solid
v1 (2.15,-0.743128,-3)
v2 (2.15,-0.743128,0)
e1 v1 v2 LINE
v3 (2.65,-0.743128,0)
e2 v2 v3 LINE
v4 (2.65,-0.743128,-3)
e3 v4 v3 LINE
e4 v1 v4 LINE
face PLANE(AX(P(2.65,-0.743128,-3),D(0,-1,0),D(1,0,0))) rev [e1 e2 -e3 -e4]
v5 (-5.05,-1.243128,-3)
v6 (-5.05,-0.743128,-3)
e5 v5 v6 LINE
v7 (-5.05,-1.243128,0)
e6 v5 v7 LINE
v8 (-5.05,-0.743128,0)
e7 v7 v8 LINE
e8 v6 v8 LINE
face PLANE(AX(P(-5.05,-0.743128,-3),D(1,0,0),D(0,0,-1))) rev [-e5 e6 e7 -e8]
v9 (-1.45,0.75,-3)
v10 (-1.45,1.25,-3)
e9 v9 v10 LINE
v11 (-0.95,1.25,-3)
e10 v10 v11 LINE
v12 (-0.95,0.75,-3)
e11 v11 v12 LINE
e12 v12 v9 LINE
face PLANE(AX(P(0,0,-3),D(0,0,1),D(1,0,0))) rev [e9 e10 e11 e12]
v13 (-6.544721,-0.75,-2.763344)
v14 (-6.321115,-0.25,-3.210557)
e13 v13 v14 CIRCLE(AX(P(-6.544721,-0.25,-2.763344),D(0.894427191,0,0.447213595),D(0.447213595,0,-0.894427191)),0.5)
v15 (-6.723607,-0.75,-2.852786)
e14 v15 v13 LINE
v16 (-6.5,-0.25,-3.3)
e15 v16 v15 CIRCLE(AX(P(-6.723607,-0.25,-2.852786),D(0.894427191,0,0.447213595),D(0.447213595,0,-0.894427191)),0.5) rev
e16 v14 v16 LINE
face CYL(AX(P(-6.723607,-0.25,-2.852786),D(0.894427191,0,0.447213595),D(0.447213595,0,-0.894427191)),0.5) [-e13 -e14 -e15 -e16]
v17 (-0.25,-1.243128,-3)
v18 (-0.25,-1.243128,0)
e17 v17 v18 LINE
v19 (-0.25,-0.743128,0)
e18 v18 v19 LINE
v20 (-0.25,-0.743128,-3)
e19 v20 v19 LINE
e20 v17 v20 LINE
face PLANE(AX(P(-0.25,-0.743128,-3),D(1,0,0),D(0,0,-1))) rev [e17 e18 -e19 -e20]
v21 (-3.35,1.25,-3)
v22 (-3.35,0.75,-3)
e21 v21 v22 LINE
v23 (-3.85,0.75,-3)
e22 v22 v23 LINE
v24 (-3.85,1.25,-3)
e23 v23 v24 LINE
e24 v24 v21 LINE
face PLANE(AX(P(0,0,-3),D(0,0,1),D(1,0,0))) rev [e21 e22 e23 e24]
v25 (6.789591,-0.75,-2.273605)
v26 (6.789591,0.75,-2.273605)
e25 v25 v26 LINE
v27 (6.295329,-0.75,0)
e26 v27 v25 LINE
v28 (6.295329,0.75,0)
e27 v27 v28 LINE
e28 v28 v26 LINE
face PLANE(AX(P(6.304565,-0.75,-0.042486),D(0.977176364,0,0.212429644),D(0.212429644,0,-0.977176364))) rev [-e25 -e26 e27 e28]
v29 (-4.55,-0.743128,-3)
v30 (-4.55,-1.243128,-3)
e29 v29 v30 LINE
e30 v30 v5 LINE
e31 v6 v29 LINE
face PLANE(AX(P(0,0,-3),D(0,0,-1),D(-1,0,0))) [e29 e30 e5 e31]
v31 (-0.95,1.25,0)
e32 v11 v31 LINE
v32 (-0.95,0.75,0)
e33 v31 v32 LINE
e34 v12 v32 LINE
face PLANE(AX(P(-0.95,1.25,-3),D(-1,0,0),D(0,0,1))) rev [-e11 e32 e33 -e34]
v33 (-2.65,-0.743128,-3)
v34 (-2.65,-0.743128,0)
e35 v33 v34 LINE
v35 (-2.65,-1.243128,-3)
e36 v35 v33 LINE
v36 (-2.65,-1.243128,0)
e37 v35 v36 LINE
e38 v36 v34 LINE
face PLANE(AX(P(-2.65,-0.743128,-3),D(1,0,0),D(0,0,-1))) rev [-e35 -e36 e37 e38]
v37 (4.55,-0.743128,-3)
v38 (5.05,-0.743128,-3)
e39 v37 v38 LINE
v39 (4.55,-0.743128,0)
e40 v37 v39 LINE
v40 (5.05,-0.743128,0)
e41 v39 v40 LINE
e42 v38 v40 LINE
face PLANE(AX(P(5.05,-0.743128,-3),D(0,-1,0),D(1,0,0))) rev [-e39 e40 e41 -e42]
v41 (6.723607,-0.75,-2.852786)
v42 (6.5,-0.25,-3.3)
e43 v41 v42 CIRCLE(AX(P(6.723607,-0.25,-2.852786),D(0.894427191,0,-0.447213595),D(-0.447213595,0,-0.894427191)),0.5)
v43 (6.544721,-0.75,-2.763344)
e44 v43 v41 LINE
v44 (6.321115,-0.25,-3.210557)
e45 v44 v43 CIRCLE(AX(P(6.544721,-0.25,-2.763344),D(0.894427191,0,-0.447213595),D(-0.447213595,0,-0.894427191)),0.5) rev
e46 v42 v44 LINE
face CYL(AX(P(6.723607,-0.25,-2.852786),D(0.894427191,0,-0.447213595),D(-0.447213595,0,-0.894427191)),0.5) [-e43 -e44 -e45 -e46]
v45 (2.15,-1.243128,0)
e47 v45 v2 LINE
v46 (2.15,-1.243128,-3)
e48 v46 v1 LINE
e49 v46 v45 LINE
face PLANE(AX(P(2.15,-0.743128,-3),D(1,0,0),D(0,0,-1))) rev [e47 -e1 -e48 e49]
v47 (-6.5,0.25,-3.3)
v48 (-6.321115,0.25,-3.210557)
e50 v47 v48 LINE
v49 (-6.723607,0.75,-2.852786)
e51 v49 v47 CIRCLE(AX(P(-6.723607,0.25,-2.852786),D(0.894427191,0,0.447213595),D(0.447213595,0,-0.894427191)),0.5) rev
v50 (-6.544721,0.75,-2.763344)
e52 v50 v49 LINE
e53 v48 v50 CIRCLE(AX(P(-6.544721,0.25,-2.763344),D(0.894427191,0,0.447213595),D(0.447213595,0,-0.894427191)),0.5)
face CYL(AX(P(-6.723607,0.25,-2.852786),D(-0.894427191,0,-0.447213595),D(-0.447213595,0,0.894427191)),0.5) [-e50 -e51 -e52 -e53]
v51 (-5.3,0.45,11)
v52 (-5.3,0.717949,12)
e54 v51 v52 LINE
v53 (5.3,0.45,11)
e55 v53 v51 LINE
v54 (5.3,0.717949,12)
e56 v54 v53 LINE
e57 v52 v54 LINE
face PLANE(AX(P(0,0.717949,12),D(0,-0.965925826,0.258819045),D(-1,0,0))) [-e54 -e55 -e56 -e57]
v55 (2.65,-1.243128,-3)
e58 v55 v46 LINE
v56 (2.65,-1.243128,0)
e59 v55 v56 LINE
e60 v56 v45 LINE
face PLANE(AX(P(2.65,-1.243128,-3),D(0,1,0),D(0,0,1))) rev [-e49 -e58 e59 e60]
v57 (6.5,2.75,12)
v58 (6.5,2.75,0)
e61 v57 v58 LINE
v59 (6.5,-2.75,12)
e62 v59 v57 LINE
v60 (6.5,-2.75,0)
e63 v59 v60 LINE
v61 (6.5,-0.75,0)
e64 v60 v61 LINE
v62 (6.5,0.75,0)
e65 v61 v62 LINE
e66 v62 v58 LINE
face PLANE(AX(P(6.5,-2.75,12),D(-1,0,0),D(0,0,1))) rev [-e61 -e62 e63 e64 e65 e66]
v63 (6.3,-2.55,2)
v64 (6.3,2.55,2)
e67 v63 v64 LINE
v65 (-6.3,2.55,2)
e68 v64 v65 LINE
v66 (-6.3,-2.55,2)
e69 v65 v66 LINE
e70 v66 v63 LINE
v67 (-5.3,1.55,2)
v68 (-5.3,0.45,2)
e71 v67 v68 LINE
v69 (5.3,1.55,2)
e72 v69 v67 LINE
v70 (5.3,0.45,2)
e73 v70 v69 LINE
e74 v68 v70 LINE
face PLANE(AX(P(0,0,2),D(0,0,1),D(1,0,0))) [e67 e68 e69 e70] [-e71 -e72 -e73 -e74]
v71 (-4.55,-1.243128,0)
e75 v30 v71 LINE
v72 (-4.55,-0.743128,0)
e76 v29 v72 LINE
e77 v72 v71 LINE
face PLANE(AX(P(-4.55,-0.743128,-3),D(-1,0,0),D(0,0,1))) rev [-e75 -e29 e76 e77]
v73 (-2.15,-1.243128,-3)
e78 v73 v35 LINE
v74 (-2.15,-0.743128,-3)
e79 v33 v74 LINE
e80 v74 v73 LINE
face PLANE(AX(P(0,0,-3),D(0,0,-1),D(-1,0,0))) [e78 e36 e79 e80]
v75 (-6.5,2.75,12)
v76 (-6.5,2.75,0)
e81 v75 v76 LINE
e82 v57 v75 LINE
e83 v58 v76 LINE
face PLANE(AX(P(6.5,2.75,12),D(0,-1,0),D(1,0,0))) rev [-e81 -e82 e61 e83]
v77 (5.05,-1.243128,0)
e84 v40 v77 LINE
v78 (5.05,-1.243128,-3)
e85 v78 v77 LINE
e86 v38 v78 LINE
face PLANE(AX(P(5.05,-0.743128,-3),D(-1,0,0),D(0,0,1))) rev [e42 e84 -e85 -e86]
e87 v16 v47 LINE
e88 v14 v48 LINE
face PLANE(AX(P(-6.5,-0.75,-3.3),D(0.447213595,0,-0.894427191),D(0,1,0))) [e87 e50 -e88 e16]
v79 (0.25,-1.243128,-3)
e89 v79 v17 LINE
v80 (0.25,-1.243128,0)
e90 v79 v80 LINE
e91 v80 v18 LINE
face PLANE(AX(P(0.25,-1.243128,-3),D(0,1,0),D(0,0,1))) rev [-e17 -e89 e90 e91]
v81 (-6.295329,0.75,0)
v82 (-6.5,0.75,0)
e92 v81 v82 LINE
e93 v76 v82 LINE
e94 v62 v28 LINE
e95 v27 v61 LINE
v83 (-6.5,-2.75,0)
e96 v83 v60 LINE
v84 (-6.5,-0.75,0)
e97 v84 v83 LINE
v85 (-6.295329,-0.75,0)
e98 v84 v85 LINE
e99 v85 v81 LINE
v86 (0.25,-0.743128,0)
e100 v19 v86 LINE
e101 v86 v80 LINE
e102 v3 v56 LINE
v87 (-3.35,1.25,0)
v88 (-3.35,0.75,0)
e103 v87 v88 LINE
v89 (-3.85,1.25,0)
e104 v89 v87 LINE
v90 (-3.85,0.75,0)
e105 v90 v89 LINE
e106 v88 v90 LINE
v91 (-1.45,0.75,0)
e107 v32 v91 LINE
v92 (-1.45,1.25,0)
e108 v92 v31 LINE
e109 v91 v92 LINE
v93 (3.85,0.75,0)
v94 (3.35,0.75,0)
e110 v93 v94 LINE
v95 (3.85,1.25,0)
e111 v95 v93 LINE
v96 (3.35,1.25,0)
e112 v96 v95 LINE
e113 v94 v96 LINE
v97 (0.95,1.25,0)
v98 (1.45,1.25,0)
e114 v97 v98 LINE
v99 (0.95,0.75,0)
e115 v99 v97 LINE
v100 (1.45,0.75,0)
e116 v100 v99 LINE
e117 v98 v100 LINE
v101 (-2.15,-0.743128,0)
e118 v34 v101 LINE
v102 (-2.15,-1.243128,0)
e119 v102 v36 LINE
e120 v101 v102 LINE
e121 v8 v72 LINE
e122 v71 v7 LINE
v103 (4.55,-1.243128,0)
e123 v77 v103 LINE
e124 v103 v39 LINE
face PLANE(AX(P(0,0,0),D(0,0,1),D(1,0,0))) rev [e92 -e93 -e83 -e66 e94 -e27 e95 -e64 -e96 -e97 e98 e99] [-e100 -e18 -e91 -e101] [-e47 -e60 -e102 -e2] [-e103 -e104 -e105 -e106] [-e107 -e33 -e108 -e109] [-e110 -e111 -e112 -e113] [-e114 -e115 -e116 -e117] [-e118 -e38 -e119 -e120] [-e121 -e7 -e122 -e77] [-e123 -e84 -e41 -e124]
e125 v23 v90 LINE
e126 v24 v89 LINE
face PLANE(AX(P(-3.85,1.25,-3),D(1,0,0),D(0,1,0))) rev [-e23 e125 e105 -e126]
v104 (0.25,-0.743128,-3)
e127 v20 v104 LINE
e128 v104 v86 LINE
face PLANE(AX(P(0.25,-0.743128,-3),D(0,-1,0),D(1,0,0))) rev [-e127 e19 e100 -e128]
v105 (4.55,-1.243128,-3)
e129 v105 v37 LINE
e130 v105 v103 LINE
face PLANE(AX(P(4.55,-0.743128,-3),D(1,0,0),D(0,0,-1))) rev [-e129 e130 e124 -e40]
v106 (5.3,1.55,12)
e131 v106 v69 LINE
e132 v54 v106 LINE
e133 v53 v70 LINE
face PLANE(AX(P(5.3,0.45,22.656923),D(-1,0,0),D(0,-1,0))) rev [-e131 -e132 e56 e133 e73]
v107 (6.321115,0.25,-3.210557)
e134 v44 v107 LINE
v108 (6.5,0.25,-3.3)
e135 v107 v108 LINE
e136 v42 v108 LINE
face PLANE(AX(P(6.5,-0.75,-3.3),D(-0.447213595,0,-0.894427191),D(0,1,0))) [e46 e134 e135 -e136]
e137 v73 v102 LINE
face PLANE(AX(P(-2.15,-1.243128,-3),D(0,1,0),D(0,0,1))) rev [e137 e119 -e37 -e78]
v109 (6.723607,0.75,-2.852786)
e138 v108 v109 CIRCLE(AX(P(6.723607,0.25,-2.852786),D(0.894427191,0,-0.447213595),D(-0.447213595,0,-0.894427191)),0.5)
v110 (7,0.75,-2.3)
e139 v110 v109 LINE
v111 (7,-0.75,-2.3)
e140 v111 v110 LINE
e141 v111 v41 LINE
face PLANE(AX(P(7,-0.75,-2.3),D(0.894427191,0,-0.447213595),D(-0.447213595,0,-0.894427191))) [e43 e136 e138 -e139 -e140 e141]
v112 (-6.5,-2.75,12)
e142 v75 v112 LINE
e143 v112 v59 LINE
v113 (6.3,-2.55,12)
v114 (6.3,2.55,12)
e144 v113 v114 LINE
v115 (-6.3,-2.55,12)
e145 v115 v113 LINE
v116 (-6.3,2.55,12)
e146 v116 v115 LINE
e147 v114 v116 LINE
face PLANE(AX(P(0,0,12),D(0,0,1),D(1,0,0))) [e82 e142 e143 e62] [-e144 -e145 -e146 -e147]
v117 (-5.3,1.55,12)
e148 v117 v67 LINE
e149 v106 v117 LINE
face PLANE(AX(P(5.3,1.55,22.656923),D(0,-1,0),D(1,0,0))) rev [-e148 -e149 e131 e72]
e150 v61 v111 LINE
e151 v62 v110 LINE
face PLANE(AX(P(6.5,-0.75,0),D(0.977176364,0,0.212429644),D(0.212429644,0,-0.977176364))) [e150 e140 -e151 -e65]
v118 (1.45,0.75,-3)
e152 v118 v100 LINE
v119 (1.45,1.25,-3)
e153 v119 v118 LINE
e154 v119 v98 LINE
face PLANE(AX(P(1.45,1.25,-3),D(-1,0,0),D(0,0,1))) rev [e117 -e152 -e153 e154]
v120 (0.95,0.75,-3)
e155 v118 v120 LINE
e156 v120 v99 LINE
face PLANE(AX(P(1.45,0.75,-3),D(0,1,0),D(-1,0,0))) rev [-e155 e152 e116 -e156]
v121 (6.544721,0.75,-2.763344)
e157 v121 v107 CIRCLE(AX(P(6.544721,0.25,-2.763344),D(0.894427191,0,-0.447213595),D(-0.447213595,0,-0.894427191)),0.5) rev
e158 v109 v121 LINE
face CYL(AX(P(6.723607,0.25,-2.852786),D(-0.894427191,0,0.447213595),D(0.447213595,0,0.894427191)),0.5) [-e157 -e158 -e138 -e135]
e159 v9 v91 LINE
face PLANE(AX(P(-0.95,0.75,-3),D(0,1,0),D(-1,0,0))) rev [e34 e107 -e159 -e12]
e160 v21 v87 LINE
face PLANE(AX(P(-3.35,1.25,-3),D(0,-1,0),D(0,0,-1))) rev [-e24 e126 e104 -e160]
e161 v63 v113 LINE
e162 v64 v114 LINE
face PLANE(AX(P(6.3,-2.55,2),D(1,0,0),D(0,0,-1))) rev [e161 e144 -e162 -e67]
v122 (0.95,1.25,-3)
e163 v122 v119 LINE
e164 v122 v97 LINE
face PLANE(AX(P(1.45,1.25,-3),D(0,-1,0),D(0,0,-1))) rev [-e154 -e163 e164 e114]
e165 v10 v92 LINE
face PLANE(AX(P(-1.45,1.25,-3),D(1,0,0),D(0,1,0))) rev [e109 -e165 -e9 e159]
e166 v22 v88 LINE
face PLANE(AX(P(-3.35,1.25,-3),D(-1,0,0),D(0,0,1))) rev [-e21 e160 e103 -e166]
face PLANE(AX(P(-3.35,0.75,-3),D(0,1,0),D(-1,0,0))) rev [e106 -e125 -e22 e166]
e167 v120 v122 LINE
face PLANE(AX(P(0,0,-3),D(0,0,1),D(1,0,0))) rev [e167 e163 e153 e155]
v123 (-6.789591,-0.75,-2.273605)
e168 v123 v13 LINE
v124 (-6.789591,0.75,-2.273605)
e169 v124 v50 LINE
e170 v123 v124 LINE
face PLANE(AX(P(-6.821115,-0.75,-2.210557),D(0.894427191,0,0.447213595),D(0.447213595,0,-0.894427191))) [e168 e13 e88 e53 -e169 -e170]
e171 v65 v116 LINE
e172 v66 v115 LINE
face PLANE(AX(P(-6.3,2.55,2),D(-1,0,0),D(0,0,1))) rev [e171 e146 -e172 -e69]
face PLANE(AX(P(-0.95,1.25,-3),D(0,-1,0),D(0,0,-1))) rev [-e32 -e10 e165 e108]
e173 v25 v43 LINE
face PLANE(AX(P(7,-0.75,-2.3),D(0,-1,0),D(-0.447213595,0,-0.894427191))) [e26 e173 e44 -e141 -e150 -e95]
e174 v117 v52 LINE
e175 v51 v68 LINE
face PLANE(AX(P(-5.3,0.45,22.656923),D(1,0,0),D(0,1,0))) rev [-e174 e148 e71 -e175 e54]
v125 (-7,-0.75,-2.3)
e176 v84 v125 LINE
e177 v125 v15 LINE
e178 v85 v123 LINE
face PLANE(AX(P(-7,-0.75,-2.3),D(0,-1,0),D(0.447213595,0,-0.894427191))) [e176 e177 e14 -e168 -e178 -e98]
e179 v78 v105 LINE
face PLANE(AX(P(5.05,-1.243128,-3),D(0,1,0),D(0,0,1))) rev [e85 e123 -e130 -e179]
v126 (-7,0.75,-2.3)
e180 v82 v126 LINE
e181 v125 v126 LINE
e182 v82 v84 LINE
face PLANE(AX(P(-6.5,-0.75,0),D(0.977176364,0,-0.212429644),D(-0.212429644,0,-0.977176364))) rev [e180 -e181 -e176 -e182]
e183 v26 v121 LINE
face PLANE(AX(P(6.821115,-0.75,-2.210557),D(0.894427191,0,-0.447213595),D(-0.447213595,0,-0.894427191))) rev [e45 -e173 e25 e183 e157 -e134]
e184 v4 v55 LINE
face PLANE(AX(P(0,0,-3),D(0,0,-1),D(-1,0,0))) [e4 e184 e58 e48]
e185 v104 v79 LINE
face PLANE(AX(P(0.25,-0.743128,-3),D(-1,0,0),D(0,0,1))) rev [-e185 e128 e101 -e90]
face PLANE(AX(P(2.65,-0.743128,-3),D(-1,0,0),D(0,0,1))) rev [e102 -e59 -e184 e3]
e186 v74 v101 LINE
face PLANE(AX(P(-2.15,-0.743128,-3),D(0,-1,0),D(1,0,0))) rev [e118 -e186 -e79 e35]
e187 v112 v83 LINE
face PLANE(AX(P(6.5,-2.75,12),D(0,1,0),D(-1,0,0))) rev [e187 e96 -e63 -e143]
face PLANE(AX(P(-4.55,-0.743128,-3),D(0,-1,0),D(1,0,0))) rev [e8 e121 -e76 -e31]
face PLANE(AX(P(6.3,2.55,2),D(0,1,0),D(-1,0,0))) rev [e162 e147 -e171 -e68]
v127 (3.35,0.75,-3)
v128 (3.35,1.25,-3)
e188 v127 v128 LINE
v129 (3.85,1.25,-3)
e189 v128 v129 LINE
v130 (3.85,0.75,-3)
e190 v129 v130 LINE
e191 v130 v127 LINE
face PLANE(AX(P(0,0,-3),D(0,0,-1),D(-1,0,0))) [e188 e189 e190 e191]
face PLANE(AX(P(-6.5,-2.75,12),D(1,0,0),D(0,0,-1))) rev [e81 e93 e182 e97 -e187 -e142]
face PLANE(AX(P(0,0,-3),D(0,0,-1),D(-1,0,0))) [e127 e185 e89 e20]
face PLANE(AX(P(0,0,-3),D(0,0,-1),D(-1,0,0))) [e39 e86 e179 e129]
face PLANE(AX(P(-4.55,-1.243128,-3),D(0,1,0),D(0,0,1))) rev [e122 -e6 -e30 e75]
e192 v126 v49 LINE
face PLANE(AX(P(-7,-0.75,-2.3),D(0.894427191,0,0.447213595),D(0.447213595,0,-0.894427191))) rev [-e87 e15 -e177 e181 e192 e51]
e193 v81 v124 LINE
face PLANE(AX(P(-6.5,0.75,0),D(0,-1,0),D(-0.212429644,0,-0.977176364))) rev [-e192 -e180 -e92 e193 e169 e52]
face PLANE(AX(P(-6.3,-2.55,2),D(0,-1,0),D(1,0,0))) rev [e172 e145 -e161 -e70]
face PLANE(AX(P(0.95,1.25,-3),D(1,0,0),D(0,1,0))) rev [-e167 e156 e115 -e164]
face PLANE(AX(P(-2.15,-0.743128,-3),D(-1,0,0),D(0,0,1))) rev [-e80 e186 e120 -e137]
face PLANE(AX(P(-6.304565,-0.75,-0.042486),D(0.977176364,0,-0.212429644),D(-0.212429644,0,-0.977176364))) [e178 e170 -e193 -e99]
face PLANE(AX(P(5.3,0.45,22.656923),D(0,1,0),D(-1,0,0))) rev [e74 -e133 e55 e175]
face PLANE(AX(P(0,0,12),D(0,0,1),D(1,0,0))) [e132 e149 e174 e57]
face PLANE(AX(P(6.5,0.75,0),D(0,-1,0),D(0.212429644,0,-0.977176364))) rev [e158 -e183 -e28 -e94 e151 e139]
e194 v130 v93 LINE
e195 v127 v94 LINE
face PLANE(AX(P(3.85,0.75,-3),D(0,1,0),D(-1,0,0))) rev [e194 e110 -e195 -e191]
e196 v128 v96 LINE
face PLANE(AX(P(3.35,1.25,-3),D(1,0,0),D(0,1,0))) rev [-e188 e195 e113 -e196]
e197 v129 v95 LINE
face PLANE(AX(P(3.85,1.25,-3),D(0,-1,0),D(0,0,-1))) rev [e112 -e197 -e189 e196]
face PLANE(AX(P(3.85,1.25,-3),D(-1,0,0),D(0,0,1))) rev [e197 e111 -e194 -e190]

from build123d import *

# Parameters (mm, degrees)
SKETCH_1_W          = 13
SKETCH_1_H          = 5.5
EXTRUDE_1_DEPTH     = 12
SKETCH_2_W          = 12.6
SKETCH_2_H          = 5.1
CUT_EXTRUDE_1_DEPTH = 10
SKETCH_5_W          = 10.6
SKETCH_5_H          = 1.1
EXTRUDE_3_DEPTH     = 10
CHAMFER_1_SIZE      = 1
CHAMFER_1_SIZE2     = 0.267949192
SKETCH_13_W         = 0.5
SKETCH_13_H         = 0.5
EXTRUDE_7_DEPTH     = 3
THICKEN_START       = -0.75
THICKEN_1_DEPTH     = 1.5
THICKEN_2_DEPTH     = 1.5
FILLET_2_R          = 0.5


# Read off the part's stored shape, not the designer's step: 加厚1, 加厚2
with BuildPart() as part:
    # 草图1 → 凸台-拉伸1 (new body)
    with BuildSketch(Plane.XY):
        Rectangle(SKETCH_1_W, SKETCH_1_H)
    extrude(amount=EXTRUDE_1_DEPTH)

    # 草图2 → 切除-拉伸1 (cut)
    with BuildSketch(Plane.XY.offset(12)):
        Rectangle(SKETCH_2_W, SKETCH_2_H)
    extrude(amount=-CUT_EXTRUDE_1_DEPTH, mode=Mode.SUBTRACT)

    # 草图5 → 凸台-拉伸3 (add)
    with BuildSketch(Plane.XY.offset(2)):
        with Locations((0, 1)):
            Rectangle(SKETCH_5_W, SKETCH_5_H)
    extrude(amount=EXTRUDE_3_DEPTH)

    # 倒角1
    chamfer_1_edges = [part.edges().sort_by_distance(p)[0] for p in [
        (0, 0.45, 12),
    ]]
    chamfer_1_side = [part.faces().sort_by_distance(p)[0] for p in [
        (0, 0.45, 7),
    ]]
    chamfer(chamfer_1_edges, length=CHAMFER_1_SIZE, length2=CHAMFER_1_SIZE2, reference=chamfer_1_side[0])

    # 草图13 → 凸台-拉伸7 (add)
    with BuildSketch(Plane(origin=(0, 0, 0), x_dir=(-1, 0, 0), z_dir=(0, 0, -1))):
        with Locations((-3.6, 1)):
            Rectangle(SKETCH_13_W, SKETCH_13_H)
        with Locations((-1.2, 1)):
            Rectangle(SKETCH_13_W, SKETCH_13_H)
        with Locations((1.2, 1)):
            Rectangle(SKETCH_13_W, SKETCH_13_H)
        with Locations((3.6, 1)):
            Rectangle(SKETCH_13_W, SKETCH_13_H)
        with Locations((-2.4, -0.993127881)):
            Rectangle(SKETCH_13_W, SKETCH_13_H)
        with Locations((-4.8, -0.993127881)):
            Rectangle(SKETCH_13_W, SKETCH_13_H)
        with Locations((0, -0.993127881)):
            Rectangle(SKETCH_13_W, SKETCH_13_H)
        with Locations((2.4, -0.993127881)):
            Rectangle(SKETCH_13_W, SKETCH_13_H)
        with Locations((4.8, -0.993127881)):
            Rectangle(SKETCH_13_W, SKETCH_13_H)
    extrude(amount=EXTRUDE_7_DEPTH)

    # 加厚1 outline → 加厚1 (add)
    with BuildSketch(Plane(origin=(0, 0, 0), x_dir=(1, 0, 0), z_dir=(0, 1, 0)).offset(THICKEN_START)):
        Polygon((6.78959064, 2.273605125), (6.295328656, 0), (6.5, 0), (7, 2.3), (6.5, 3.3), (6.321114562, 3.210557281), align=None)
    extrude(amount=THICKEN_1_DEPTH)

    # 加厚2 outline → 加厚2 (add)
    with BuildSketch(Plane(origin=(0, 0, 0), x_dir=(1, 0, 0), z_dir=(0, 1, 0)).offset(THICKEN_START)):
        Polygon((-6.5, 0), (-6.295328656, 0), (-6.78959064, 2.273605125), (-6.321114562, 3.210557281), (-6.5, 3.3), (-7, 2.3), align=None)
    extrude(amount=THICKEN_2_DEPTH)

    # 圆角2
    fillet_2_edges = [part.edges().sort_by_distance(p)[0] for p in [
        (6.410557281, -0.75, -3.25527864),
        (6.410557281, 0.75, -3.25527864),
        (-6.410557281, -0.75, -3.25527864),
        (-6.410557281, 0.75, -3.25527864),
    ]]
    fillet(fillet_2_edges, radius=FILLET_2_R)


solid = part.part
